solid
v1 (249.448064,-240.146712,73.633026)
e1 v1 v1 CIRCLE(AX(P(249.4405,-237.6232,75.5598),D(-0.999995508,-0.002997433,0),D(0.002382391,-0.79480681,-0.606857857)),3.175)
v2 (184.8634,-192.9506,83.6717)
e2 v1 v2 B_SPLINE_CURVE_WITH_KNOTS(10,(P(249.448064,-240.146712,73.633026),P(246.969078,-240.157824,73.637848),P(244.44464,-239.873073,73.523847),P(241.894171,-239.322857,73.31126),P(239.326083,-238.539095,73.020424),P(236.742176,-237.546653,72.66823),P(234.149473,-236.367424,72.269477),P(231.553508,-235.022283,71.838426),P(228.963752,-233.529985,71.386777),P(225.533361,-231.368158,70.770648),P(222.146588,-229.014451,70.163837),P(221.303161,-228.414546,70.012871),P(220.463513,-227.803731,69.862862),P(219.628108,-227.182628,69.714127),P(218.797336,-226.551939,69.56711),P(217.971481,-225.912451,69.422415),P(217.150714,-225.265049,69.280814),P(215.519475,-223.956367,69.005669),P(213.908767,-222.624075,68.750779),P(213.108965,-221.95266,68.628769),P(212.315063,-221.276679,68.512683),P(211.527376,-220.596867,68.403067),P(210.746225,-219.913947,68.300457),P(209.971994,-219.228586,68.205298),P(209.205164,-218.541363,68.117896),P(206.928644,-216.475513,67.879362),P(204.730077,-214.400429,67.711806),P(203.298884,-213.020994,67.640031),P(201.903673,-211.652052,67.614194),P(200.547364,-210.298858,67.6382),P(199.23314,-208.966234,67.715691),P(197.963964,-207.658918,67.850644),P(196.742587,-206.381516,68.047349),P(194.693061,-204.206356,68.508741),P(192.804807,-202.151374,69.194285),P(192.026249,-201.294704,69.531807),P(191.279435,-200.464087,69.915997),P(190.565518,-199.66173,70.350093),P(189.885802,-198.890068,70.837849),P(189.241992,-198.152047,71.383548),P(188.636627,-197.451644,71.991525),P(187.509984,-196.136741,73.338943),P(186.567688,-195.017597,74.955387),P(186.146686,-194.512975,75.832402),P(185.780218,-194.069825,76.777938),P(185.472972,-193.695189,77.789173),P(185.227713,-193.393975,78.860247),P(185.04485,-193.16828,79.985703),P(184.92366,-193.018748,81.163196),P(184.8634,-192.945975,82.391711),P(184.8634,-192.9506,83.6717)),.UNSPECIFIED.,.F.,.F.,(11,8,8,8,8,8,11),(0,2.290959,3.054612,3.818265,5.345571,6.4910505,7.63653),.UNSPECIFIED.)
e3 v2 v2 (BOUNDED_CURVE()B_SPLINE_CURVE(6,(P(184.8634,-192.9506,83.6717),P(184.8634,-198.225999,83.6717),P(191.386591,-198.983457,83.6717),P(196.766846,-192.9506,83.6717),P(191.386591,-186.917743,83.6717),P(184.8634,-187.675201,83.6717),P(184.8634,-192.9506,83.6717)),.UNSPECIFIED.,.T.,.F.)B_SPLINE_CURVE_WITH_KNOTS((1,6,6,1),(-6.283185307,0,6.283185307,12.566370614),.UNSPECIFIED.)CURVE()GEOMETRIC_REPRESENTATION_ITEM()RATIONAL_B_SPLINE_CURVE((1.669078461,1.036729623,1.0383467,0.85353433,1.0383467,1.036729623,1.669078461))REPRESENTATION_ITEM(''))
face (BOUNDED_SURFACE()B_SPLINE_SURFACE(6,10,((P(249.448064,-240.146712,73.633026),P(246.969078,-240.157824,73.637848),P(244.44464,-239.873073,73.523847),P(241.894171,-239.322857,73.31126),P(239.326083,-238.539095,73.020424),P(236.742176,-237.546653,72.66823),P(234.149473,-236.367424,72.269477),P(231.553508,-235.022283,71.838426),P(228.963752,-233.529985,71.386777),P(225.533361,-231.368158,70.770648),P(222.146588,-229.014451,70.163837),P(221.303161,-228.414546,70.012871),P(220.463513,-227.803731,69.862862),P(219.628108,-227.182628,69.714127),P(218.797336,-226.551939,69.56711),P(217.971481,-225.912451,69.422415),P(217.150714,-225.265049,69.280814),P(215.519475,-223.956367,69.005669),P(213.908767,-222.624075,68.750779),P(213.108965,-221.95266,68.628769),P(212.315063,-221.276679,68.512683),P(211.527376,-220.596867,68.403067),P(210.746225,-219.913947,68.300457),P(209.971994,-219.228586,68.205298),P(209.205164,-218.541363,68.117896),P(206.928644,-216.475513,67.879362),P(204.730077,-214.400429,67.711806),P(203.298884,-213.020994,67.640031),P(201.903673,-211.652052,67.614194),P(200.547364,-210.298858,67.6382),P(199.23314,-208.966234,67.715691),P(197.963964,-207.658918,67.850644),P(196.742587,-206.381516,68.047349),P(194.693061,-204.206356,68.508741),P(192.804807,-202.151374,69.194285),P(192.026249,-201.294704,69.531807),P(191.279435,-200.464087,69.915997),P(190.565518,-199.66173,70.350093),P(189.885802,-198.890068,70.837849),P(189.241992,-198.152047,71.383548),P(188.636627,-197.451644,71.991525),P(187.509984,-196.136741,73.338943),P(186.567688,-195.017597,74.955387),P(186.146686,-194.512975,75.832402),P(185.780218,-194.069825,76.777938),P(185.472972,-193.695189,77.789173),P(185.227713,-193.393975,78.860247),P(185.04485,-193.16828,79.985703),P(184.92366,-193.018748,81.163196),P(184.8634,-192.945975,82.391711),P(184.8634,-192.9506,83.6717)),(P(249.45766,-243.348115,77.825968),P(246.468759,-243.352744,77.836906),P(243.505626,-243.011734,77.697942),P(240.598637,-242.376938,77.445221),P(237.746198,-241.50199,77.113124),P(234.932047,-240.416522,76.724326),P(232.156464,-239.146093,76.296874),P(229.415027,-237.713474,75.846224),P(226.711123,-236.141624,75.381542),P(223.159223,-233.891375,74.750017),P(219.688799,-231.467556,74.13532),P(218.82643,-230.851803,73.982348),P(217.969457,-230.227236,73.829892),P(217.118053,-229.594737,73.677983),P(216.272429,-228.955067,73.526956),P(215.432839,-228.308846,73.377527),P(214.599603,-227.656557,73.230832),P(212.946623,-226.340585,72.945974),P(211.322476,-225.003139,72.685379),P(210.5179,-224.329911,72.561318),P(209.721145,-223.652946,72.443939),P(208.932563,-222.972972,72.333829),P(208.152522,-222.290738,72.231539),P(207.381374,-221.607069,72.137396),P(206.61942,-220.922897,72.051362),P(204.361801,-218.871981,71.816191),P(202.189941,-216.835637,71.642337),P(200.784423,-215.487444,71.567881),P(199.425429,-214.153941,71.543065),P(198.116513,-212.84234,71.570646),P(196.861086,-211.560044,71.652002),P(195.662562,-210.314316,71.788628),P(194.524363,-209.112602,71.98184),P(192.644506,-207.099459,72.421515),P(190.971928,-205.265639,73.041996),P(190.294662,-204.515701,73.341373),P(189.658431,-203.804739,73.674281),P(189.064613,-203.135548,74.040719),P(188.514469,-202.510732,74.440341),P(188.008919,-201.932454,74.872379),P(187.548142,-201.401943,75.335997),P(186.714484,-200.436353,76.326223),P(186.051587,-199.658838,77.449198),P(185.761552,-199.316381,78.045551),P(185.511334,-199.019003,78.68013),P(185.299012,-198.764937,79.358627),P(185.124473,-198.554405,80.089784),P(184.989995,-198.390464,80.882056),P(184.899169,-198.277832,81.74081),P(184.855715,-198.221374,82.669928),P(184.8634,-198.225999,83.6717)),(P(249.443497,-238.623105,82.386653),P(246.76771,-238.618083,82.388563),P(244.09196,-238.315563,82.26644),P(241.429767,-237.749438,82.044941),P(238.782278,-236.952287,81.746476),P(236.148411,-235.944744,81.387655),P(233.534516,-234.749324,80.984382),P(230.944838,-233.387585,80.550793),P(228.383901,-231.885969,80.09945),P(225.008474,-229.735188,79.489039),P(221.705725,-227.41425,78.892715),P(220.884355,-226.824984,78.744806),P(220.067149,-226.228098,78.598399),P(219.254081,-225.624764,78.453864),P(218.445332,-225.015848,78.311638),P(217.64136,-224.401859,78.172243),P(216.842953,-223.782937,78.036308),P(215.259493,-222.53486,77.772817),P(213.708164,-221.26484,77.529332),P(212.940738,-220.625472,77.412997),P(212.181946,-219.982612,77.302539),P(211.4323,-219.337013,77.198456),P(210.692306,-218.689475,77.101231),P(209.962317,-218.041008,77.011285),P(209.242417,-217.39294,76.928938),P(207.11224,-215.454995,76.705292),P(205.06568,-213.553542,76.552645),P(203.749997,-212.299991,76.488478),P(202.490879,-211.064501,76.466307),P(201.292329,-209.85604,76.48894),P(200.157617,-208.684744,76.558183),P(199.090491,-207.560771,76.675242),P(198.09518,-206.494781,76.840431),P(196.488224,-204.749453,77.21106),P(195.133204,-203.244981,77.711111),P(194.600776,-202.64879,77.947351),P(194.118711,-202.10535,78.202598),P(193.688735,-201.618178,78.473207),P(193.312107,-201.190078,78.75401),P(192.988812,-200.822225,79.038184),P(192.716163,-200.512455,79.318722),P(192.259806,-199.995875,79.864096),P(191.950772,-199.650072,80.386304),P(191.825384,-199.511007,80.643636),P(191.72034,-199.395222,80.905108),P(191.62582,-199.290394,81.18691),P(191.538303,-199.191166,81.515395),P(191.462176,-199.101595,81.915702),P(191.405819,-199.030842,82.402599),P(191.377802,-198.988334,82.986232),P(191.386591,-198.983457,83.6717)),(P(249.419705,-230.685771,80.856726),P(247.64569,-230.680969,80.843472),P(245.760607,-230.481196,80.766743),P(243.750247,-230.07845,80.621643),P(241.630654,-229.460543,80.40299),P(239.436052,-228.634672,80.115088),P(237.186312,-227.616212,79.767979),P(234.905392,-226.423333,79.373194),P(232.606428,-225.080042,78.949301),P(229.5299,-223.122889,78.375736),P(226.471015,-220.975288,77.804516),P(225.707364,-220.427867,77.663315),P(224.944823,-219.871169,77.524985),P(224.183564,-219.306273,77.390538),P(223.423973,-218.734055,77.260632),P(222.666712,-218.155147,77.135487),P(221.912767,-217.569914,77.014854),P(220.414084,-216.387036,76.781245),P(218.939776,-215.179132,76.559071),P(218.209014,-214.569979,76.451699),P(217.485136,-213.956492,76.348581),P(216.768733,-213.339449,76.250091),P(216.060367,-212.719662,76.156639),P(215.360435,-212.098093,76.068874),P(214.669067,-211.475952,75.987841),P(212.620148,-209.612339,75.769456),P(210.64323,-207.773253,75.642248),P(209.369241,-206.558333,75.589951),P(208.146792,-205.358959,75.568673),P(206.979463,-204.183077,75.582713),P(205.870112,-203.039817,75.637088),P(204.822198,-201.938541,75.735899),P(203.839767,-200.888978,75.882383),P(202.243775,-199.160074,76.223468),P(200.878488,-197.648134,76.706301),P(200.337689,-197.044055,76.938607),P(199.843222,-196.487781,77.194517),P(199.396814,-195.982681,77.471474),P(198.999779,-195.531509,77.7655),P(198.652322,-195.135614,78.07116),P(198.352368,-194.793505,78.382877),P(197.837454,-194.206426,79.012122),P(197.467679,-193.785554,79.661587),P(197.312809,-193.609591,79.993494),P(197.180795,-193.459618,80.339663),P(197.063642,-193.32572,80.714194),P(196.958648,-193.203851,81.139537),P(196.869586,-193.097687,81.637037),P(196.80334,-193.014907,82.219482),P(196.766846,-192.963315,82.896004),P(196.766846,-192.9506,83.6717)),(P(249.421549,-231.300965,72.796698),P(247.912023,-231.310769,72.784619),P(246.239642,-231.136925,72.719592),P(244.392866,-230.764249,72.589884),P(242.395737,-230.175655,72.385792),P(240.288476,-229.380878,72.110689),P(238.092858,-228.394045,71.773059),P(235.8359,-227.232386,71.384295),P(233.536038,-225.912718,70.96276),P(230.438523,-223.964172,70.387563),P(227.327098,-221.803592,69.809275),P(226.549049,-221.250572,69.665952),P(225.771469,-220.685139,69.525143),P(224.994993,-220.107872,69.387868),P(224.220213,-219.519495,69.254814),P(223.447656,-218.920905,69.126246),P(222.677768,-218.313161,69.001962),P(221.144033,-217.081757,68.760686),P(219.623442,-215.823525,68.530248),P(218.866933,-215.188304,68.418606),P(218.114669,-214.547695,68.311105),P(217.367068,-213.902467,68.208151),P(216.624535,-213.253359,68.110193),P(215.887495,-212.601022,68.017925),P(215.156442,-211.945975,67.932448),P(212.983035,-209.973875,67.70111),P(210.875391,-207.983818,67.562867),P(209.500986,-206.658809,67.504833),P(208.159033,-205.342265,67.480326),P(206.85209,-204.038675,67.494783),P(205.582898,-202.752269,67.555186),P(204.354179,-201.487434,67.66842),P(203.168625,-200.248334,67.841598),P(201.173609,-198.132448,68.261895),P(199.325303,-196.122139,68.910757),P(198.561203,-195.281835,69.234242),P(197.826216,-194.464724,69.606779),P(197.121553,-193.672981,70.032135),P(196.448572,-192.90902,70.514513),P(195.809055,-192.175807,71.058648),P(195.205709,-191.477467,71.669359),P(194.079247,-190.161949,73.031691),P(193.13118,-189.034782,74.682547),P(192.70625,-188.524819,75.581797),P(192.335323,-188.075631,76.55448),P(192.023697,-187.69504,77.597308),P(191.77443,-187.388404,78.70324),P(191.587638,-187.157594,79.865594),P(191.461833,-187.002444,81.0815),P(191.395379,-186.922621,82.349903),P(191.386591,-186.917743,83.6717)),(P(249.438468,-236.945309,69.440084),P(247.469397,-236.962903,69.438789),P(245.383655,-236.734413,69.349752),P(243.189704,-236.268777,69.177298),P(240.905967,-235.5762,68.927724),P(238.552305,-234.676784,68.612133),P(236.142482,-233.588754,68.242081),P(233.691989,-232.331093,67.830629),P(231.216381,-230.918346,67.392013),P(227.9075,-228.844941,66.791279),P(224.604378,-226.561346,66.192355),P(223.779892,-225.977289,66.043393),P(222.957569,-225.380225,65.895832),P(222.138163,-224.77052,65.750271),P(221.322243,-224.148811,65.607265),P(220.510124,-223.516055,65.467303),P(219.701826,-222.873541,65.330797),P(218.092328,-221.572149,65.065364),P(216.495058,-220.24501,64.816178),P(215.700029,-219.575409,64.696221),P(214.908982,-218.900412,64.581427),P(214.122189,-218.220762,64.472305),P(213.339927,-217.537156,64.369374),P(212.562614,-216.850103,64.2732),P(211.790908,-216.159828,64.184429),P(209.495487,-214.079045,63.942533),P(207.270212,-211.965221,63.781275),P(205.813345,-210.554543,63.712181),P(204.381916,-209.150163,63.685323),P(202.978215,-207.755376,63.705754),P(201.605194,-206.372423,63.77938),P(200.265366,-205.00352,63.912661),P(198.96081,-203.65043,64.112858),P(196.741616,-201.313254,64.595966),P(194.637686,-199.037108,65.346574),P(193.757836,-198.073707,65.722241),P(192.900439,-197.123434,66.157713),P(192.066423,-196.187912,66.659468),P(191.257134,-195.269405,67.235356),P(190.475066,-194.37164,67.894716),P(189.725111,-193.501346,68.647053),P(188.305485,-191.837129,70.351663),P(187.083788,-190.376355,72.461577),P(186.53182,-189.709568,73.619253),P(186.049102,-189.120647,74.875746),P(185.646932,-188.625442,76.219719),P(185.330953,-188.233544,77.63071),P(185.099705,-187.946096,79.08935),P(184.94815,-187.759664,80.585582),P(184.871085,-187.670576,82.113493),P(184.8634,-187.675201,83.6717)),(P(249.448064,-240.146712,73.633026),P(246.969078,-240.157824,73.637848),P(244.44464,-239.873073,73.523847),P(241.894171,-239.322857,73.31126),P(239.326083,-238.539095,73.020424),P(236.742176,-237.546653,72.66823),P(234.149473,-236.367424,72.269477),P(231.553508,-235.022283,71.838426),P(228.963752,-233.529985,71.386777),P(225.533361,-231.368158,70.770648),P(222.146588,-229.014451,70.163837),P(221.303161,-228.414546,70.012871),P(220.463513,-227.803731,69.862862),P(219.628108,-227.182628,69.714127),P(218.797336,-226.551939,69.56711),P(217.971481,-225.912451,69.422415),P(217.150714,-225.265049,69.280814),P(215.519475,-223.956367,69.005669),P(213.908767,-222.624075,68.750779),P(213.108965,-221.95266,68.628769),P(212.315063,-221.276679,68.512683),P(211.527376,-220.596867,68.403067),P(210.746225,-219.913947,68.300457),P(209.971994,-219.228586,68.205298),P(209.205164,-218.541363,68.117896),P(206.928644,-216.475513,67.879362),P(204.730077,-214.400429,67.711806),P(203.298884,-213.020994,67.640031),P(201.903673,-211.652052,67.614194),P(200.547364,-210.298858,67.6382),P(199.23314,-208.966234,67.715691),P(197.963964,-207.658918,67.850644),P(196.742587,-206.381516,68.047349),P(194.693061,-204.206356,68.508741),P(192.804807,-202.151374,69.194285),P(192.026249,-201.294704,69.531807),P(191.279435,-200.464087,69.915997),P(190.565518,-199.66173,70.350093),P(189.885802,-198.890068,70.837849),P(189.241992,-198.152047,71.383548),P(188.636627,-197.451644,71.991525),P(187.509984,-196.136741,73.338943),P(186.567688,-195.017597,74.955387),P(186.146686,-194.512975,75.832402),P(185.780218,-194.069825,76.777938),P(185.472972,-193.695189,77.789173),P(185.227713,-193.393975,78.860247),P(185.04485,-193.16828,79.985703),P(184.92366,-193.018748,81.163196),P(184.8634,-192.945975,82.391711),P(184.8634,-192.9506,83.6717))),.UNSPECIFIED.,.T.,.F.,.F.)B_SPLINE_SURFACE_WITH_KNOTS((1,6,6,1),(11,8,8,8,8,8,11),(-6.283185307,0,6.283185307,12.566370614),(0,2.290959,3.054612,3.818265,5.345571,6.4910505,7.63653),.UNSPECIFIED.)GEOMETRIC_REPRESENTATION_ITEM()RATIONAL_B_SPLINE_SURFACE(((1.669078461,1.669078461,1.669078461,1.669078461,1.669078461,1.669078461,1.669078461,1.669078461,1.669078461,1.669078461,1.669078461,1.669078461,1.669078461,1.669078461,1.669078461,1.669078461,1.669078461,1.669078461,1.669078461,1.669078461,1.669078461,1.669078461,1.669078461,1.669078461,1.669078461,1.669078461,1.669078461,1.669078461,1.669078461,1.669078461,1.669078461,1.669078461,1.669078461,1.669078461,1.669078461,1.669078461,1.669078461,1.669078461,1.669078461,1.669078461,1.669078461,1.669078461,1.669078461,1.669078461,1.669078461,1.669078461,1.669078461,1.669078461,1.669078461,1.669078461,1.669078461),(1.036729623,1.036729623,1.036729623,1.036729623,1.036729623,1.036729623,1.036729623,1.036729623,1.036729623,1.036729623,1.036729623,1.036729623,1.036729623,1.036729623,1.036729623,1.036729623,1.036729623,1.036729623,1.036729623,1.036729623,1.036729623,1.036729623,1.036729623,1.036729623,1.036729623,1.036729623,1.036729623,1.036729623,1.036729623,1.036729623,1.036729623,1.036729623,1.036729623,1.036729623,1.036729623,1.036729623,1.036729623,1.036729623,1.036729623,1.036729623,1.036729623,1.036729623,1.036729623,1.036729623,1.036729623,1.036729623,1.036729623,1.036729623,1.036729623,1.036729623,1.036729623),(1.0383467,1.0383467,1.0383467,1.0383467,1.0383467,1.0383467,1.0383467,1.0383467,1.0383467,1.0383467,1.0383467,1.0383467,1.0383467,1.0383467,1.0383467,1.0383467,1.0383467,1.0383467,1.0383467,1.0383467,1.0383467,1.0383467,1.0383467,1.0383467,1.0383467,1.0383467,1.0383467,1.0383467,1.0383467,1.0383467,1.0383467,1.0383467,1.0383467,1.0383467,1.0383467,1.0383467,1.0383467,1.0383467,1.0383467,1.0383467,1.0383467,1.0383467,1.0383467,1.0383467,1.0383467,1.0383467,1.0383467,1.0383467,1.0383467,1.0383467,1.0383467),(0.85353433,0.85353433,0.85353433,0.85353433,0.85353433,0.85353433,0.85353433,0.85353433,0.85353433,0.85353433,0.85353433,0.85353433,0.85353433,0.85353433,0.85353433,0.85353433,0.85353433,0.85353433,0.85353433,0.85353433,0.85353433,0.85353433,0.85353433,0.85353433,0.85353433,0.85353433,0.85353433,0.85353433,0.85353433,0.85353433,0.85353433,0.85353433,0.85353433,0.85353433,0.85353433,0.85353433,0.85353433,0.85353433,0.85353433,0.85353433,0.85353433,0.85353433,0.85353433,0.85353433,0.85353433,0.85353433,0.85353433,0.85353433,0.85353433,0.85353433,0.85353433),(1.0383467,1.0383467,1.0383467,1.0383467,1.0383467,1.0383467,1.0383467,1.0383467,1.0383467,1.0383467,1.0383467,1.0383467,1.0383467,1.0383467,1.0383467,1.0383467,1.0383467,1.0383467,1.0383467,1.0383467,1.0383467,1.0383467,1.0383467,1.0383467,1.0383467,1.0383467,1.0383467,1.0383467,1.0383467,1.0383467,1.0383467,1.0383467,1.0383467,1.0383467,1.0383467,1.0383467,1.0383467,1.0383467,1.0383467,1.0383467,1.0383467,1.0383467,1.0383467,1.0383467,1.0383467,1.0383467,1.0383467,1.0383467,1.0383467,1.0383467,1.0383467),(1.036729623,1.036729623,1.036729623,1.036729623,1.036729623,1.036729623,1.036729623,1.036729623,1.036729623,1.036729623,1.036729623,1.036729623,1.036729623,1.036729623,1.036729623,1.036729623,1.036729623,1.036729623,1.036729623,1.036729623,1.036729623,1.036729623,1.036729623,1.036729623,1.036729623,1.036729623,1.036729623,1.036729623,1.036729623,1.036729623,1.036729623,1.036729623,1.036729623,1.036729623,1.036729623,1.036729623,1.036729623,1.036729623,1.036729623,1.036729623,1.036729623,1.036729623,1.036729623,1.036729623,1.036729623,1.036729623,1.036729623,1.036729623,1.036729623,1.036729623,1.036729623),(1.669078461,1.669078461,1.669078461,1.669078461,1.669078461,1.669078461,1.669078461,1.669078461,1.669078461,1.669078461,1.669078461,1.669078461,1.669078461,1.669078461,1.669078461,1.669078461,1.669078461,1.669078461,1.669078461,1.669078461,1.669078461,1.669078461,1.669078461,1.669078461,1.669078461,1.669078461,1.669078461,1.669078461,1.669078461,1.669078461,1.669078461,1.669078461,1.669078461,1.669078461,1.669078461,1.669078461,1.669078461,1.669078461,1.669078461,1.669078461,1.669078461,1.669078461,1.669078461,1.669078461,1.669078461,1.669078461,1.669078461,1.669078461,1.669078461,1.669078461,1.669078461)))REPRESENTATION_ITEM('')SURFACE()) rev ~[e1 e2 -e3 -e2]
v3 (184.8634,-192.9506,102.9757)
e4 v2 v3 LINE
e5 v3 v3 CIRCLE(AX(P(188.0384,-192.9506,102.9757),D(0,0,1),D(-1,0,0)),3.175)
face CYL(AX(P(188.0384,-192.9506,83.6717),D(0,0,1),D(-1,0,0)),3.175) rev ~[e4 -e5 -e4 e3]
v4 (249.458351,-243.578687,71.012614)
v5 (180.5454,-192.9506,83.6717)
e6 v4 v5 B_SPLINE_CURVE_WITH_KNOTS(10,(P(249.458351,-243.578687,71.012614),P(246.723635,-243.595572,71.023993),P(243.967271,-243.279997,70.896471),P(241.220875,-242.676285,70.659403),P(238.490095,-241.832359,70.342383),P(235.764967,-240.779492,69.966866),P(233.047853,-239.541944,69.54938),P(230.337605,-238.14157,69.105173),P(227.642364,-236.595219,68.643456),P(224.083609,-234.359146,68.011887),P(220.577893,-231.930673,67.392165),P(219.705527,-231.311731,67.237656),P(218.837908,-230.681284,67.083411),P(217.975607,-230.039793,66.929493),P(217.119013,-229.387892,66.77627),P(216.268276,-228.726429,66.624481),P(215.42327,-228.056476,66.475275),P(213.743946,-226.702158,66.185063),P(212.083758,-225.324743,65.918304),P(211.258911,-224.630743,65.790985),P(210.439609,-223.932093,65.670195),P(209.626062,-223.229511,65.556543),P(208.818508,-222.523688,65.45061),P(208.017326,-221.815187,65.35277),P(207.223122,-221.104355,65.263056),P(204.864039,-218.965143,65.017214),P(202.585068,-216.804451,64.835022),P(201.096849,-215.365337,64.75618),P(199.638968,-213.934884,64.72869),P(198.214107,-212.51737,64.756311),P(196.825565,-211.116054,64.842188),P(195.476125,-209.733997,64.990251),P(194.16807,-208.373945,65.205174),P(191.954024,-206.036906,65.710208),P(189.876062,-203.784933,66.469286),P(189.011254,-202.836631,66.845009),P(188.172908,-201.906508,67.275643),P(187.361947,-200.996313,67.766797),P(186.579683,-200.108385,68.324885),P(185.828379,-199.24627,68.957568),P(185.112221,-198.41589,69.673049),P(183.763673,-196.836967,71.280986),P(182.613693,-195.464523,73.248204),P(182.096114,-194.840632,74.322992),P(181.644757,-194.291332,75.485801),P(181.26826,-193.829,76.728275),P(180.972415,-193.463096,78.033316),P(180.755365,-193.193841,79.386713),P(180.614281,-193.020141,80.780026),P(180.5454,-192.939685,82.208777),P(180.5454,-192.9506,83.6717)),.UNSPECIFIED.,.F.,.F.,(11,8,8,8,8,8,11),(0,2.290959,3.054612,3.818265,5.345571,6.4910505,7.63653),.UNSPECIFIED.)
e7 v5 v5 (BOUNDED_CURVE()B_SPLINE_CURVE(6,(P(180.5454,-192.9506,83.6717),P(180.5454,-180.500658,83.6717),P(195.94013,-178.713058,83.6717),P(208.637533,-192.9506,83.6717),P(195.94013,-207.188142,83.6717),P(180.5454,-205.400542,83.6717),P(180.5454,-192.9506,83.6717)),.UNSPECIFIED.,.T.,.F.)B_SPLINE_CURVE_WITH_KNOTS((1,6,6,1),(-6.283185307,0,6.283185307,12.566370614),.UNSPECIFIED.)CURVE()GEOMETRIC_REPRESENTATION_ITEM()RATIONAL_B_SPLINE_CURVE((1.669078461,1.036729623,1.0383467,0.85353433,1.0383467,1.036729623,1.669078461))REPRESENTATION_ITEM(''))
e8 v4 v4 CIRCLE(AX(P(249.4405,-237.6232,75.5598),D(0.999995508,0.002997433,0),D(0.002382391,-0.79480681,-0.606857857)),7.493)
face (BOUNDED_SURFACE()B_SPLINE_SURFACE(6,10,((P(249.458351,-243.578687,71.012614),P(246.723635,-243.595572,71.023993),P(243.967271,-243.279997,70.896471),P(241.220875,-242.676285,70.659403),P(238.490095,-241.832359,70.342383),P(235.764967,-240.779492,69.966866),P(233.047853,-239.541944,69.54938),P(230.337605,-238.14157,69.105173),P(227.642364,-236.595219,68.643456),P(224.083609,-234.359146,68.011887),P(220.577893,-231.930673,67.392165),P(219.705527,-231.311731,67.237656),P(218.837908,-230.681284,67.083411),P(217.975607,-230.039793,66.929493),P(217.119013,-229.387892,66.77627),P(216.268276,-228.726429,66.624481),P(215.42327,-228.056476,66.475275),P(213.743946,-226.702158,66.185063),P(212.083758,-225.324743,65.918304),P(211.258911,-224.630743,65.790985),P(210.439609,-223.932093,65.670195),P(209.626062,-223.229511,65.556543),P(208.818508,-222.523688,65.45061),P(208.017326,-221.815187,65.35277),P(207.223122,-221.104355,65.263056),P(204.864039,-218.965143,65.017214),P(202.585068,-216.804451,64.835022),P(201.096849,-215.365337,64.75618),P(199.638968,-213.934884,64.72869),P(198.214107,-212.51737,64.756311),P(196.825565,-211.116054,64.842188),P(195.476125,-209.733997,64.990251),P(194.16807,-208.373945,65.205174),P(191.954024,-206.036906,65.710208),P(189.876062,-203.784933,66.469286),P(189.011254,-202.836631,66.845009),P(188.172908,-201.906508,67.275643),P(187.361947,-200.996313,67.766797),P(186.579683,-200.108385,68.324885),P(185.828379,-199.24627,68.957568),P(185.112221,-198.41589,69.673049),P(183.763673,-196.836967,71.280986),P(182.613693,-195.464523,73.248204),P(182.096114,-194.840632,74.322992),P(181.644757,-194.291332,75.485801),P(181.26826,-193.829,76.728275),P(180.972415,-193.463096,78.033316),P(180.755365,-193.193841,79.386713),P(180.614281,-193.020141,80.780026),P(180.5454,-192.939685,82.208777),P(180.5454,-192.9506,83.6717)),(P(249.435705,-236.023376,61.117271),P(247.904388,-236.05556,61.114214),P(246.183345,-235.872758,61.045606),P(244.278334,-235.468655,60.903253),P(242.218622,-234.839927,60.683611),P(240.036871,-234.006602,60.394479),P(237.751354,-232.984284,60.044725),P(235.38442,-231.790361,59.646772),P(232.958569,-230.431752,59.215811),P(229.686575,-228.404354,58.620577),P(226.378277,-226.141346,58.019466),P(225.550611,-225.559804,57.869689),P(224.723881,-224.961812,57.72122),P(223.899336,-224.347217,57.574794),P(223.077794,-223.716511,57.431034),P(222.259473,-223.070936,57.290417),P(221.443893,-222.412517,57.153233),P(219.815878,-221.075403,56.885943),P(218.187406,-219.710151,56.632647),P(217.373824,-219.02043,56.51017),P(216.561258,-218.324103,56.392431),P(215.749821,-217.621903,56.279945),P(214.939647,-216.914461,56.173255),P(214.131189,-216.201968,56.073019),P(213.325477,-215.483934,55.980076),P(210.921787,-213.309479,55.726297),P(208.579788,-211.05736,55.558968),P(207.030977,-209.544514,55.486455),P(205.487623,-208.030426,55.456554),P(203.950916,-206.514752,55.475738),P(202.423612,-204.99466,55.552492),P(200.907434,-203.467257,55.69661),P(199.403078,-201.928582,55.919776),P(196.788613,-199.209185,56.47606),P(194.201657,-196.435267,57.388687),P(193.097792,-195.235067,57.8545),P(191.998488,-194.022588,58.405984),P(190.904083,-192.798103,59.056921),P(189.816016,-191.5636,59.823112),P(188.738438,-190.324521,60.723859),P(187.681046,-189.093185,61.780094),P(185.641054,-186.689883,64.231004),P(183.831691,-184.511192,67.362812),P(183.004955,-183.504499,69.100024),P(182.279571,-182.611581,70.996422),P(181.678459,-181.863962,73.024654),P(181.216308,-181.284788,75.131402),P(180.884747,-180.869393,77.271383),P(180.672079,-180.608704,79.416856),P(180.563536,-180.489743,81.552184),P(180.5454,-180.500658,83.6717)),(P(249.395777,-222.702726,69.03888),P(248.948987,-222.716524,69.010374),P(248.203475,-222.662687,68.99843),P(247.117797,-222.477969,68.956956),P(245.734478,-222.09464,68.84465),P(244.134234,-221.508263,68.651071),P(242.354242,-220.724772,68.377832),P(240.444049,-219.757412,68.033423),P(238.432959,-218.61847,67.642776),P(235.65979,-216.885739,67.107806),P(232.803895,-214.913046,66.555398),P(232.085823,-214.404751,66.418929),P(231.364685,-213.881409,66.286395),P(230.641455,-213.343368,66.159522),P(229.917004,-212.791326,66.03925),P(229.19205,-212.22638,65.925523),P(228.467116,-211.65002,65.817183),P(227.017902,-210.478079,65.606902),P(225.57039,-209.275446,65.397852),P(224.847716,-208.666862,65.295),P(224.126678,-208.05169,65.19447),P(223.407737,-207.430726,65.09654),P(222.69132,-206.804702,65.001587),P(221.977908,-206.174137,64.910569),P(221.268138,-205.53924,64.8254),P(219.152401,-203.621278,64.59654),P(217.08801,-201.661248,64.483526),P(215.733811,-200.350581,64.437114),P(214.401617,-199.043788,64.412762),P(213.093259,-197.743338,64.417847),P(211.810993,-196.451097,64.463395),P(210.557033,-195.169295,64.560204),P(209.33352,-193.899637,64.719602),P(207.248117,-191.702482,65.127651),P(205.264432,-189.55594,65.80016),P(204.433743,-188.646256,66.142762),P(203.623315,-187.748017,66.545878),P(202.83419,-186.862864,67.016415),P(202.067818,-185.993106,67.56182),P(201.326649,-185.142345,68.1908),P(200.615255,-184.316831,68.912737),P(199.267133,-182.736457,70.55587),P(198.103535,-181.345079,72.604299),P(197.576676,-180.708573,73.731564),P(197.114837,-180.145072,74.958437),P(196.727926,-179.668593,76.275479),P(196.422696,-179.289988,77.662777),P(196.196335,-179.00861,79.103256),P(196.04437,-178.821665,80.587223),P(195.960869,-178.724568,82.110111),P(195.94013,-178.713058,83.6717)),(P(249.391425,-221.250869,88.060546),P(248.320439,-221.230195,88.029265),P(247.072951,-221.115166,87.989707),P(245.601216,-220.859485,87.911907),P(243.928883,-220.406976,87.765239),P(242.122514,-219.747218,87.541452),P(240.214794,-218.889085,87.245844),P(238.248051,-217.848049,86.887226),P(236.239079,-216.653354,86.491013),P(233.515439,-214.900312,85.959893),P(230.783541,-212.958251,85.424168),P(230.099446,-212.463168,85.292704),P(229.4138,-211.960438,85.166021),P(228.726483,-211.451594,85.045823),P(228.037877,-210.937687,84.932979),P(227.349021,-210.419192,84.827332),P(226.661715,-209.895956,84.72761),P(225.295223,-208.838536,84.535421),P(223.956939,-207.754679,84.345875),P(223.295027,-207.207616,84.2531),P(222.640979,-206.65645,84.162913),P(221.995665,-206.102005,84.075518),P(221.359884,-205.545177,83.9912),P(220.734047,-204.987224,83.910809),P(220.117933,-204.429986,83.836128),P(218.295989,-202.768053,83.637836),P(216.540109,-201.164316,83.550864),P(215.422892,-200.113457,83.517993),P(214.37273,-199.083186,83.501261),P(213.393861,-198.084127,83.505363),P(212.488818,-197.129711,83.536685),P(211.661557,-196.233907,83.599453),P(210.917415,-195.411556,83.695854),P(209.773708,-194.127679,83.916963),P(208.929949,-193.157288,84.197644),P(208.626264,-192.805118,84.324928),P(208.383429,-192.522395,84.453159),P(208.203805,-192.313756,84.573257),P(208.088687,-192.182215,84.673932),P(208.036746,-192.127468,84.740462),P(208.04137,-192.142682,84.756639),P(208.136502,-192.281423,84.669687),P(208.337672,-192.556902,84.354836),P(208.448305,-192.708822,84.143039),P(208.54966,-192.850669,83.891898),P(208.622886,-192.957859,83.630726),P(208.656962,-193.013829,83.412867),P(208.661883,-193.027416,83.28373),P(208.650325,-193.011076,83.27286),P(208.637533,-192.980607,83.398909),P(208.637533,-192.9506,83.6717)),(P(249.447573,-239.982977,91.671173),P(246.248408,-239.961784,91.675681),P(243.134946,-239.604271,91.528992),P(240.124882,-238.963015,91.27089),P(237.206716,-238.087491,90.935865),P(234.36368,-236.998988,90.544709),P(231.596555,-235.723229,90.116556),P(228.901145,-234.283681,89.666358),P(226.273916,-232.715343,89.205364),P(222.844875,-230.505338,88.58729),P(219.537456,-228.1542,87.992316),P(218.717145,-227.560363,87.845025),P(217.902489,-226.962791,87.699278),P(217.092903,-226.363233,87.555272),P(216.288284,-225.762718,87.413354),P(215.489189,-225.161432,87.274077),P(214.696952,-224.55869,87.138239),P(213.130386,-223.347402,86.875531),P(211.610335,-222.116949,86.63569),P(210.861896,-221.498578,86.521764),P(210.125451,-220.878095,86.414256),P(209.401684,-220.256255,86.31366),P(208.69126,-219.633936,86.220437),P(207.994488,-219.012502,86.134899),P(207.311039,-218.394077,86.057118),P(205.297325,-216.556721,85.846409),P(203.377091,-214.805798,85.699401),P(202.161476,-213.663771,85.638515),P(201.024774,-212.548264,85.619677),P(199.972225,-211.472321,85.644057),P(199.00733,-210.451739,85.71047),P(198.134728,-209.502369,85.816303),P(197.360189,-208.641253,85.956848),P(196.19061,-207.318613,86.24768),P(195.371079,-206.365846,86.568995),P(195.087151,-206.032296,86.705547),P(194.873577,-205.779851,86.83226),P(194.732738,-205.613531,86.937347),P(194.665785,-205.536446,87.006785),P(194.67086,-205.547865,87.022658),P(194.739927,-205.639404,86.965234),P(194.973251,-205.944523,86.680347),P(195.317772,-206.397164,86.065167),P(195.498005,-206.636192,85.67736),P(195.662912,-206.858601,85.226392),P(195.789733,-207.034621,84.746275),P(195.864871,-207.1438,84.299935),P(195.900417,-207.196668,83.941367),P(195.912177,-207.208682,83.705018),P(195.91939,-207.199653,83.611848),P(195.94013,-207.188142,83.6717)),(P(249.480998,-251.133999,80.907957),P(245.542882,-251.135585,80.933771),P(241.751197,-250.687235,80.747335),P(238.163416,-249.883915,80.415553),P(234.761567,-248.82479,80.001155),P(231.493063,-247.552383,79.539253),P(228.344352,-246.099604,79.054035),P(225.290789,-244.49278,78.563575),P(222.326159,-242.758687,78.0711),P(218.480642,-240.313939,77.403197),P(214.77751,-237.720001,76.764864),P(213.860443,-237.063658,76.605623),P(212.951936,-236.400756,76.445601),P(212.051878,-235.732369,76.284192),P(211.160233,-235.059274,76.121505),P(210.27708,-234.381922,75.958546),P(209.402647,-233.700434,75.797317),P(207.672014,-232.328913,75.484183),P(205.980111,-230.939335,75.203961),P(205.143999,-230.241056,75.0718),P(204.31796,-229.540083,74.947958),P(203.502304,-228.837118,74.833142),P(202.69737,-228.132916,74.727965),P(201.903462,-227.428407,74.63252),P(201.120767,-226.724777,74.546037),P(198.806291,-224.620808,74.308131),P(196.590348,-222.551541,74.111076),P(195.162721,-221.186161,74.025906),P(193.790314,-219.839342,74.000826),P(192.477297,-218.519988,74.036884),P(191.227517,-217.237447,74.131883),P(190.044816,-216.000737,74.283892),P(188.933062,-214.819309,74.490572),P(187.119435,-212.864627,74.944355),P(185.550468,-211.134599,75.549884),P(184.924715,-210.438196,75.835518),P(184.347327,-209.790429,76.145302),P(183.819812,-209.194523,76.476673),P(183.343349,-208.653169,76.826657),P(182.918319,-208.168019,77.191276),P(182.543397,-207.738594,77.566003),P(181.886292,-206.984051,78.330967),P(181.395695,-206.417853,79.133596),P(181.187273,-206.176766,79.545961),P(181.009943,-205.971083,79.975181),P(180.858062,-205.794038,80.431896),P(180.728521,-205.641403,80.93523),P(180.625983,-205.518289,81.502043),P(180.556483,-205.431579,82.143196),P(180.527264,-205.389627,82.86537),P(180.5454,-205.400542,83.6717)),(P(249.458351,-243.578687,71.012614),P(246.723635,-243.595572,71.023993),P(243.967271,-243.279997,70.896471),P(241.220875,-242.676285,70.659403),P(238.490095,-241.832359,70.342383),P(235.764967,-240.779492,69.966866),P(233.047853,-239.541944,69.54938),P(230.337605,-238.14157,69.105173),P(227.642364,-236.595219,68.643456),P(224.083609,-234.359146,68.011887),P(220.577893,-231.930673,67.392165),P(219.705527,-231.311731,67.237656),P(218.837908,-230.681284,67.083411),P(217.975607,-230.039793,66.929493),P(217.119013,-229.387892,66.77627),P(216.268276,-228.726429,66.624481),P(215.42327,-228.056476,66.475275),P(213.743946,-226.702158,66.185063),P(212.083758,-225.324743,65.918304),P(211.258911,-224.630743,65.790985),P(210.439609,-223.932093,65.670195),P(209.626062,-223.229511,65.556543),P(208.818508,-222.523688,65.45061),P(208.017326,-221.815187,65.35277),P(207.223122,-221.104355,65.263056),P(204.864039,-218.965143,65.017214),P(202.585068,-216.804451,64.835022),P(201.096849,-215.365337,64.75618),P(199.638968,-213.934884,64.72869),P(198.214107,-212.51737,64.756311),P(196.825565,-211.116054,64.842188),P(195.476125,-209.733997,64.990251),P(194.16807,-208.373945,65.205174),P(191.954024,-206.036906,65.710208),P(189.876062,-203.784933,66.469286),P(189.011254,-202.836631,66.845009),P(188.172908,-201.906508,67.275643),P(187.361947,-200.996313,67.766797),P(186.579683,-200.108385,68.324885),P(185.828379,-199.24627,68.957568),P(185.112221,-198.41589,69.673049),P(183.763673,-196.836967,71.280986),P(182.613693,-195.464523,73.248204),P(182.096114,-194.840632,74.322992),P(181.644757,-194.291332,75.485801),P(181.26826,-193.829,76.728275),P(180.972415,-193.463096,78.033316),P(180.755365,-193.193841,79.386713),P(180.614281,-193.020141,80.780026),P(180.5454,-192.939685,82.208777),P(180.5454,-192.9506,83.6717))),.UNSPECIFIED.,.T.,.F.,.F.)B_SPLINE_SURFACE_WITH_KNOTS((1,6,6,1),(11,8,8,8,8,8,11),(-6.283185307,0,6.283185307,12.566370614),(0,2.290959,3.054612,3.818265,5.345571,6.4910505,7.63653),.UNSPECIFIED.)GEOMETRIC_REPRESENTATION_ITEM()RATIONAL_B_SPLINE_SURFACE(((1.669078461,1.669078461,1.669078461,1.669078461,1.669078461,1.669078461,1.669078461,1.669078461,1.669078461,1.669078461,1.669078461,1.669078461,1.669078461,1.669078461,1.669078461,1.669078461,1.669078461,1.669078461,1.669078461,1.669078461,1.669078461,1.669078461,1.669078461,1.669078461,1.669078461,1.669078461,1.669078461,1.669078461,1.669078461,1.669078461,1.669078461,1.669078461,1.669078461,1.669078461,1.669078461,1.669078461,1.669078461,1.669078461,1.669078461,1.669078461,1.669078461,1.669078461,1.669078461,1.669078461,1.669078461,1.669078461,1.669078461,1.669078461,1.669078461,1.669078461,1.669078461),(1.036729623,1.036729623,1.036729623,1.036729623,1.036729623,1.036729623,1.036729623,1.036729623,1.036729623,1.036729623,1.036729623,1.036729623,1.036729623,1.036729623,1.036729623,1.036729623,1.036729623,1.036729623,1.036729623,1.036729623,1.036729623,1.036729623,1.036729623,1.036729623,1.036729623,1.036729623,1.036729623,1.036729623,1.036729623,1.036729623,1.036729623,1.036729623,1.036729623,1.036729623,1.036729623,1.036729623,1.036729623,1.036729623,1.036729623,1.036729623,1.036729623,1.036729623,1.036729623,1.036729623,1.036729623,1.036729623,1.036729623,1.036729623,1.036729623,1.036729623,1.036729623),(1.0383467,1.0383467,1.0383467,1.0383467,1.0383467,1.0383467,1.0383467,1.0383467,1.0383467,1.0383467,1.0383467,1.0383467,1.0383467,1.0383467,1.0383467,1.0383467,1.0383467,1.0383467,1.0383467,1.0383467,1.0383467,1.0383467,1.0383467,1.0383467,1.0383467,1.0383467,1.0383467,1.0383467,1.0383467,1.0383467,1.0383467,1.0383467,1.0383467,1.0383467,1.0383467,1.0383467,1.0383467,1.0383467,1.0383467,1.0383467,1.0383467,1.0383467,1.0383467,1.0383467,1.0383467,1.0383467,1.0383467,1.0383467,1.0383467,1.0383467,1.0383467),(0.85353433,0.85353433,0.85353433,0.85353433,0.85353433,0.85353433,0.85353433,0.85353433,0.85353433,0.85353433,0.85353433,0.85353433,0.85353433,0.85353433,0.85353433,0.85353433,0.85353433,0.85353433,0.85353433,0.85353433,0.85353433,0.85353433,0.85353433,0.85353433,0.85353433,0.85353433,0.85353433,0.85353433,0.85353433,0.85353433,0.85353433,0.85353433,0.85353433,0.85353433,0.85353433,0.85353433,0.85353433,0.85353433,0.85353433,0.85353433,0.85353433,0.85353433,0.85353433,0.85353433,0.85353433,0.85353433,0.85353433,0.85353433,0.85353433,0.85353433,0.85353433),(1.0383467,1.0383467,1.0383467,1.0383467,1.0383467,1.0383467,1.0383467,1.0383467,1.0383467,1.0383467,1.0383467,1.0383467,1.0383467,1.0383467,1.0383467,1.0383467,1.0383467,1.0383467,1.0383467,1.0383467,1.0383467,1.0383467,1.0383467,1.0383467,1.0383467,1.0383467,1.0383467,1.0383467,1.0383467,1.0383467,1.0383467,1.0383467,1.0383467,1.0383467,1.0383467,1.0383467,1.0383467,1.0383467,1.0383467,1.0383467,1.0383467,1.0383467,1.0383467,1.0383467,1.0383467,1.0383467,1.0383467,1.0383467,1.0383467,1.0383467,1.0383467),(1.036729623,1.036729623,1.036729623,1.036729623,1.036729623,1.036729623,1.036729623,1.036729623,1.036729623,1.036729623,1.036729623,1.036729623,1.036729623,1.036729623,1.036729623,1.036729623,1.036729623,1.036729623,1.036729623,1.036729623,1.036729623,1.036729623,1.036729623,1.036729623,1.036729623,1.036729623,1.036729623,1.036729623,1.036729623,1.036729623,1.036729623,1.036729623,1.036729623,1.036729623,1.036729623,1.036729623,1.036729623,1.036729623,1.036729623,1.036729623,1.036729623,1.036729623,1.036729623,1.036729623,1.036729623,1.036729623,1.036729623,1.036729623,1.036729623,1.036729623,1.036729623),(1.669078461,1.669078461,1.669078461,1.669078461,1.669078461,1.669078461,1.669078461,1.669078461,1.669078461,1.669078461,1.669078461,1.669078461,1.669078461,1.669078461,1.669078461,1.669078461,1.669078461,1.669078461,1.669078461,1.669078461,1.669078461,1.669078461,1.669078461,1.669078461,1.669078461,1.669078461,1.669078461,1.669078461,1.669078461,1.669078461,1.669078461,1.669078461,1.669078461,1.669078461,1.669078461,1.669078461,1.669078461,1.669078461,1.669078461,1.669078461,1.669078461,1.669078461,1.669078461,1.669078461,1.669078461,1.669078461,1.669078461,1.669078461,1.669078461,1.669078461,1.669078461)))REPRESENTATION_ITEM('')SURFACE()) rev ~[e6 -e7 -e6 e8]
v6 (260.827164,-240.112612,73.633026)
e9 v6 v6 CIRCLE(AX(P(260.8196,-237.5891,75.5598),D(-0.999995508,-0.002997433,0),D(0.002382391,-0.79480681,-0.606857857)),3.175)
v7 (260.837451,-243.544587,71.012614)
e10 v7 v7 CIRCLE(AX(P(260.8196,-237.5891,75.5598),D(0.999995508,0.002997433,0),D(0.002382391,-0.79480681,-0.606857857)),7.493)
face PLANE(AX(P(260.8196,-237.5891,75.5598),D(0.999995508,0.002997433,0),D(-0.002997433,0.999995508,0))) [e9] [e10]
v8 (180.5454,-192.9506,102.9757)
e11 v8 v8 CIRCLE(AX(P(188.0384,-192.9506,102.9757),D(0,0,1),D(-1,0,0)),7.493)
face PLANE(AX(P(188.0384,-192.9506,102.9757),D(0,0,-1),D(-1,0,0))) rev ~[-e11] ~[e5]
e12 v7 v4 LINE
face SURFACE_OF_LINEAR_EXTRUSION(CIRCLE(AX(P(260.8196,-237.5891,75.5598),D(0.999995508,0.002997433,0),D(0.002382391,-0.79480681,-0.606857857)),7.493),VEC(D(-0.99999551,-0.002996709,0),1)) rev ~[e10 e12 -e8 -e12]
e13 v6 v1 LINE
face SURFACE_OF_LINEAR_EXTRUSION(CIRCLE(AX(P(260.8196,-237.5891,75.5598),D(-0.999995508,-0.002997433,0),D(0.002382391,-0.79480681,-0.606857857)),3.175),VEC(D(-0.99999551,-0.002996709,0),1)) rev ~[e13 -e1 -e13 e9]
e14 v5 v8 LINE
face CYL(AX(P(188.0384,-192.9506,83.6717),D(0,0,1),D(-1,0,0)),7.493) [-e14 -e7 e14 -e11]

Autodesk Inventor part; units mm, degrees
ref_plane "YZ Plane" through (0, 0, 0) normal (1, 0, 0) x (0, 1, 0)
ref_plane "XZ Plane" through (0, 0, 0) normal (0, 1, 0) x (-1, 0, 0)
ref_plane "XY Plane" through (0, 0, 0) normal (0, 0, 1) x (1, 0, 0)
ref_plane "Plano de trabajo1" through (188.0384, -192.9506, 83.6717) normal (0, 0, -1) x (-1, 0, 0)
sketch "Boceto2" plane through (188.0384, -192.9506, 83.6717) normal (0, 0, -1) x (-1, 0, 0)
  circle A0 centre (0, 0) radius 7.493
  circle A1 centre (0, 0) radius 3.175
  dimension "d6" = 14.986
  dimension "d7" = 6.35
sketch3d "Boceto 3D1"
  line L0 (260.8196, -237.5891, 75.5598) -> (249.4405, -237.6232, 75.5598)
  spline S0 degree 3 poles (188.0384, -192.9506, 83.6717) (188.0384, -192.9506, 58.2166) (223.9855, -237.6995, 75.5598) (249.4405, -237.6232, 75.5598) knots 0 0 0 0 7.63653 7.63653 7.63653 7.63653
  line L1 (188.0384, -192.9506, 83.6717) -> (188.0384, -192.9506, 102.9757)
  dimension "d4" = 1
  dimension "d5" = 1
sweep "Barrido1" add profiles "Boceto2" path "Boceto 3D1"
equation "\"d6\" = OD"
equation "\"d7\" = ID"
equation "\"ID\" = 6.35"
equation "\"OD\" = 14.986"
equation "\"L\" = PL"
equation "\"PL\" = 116.078"
equation "\"Size_Designation\" = 0.25"
equation "\"RPL\" = 117.475"
equation "\"OPL\" = 85.3948"
equation "\"ROPL\" = 85.725"
properties material "Caucho"
